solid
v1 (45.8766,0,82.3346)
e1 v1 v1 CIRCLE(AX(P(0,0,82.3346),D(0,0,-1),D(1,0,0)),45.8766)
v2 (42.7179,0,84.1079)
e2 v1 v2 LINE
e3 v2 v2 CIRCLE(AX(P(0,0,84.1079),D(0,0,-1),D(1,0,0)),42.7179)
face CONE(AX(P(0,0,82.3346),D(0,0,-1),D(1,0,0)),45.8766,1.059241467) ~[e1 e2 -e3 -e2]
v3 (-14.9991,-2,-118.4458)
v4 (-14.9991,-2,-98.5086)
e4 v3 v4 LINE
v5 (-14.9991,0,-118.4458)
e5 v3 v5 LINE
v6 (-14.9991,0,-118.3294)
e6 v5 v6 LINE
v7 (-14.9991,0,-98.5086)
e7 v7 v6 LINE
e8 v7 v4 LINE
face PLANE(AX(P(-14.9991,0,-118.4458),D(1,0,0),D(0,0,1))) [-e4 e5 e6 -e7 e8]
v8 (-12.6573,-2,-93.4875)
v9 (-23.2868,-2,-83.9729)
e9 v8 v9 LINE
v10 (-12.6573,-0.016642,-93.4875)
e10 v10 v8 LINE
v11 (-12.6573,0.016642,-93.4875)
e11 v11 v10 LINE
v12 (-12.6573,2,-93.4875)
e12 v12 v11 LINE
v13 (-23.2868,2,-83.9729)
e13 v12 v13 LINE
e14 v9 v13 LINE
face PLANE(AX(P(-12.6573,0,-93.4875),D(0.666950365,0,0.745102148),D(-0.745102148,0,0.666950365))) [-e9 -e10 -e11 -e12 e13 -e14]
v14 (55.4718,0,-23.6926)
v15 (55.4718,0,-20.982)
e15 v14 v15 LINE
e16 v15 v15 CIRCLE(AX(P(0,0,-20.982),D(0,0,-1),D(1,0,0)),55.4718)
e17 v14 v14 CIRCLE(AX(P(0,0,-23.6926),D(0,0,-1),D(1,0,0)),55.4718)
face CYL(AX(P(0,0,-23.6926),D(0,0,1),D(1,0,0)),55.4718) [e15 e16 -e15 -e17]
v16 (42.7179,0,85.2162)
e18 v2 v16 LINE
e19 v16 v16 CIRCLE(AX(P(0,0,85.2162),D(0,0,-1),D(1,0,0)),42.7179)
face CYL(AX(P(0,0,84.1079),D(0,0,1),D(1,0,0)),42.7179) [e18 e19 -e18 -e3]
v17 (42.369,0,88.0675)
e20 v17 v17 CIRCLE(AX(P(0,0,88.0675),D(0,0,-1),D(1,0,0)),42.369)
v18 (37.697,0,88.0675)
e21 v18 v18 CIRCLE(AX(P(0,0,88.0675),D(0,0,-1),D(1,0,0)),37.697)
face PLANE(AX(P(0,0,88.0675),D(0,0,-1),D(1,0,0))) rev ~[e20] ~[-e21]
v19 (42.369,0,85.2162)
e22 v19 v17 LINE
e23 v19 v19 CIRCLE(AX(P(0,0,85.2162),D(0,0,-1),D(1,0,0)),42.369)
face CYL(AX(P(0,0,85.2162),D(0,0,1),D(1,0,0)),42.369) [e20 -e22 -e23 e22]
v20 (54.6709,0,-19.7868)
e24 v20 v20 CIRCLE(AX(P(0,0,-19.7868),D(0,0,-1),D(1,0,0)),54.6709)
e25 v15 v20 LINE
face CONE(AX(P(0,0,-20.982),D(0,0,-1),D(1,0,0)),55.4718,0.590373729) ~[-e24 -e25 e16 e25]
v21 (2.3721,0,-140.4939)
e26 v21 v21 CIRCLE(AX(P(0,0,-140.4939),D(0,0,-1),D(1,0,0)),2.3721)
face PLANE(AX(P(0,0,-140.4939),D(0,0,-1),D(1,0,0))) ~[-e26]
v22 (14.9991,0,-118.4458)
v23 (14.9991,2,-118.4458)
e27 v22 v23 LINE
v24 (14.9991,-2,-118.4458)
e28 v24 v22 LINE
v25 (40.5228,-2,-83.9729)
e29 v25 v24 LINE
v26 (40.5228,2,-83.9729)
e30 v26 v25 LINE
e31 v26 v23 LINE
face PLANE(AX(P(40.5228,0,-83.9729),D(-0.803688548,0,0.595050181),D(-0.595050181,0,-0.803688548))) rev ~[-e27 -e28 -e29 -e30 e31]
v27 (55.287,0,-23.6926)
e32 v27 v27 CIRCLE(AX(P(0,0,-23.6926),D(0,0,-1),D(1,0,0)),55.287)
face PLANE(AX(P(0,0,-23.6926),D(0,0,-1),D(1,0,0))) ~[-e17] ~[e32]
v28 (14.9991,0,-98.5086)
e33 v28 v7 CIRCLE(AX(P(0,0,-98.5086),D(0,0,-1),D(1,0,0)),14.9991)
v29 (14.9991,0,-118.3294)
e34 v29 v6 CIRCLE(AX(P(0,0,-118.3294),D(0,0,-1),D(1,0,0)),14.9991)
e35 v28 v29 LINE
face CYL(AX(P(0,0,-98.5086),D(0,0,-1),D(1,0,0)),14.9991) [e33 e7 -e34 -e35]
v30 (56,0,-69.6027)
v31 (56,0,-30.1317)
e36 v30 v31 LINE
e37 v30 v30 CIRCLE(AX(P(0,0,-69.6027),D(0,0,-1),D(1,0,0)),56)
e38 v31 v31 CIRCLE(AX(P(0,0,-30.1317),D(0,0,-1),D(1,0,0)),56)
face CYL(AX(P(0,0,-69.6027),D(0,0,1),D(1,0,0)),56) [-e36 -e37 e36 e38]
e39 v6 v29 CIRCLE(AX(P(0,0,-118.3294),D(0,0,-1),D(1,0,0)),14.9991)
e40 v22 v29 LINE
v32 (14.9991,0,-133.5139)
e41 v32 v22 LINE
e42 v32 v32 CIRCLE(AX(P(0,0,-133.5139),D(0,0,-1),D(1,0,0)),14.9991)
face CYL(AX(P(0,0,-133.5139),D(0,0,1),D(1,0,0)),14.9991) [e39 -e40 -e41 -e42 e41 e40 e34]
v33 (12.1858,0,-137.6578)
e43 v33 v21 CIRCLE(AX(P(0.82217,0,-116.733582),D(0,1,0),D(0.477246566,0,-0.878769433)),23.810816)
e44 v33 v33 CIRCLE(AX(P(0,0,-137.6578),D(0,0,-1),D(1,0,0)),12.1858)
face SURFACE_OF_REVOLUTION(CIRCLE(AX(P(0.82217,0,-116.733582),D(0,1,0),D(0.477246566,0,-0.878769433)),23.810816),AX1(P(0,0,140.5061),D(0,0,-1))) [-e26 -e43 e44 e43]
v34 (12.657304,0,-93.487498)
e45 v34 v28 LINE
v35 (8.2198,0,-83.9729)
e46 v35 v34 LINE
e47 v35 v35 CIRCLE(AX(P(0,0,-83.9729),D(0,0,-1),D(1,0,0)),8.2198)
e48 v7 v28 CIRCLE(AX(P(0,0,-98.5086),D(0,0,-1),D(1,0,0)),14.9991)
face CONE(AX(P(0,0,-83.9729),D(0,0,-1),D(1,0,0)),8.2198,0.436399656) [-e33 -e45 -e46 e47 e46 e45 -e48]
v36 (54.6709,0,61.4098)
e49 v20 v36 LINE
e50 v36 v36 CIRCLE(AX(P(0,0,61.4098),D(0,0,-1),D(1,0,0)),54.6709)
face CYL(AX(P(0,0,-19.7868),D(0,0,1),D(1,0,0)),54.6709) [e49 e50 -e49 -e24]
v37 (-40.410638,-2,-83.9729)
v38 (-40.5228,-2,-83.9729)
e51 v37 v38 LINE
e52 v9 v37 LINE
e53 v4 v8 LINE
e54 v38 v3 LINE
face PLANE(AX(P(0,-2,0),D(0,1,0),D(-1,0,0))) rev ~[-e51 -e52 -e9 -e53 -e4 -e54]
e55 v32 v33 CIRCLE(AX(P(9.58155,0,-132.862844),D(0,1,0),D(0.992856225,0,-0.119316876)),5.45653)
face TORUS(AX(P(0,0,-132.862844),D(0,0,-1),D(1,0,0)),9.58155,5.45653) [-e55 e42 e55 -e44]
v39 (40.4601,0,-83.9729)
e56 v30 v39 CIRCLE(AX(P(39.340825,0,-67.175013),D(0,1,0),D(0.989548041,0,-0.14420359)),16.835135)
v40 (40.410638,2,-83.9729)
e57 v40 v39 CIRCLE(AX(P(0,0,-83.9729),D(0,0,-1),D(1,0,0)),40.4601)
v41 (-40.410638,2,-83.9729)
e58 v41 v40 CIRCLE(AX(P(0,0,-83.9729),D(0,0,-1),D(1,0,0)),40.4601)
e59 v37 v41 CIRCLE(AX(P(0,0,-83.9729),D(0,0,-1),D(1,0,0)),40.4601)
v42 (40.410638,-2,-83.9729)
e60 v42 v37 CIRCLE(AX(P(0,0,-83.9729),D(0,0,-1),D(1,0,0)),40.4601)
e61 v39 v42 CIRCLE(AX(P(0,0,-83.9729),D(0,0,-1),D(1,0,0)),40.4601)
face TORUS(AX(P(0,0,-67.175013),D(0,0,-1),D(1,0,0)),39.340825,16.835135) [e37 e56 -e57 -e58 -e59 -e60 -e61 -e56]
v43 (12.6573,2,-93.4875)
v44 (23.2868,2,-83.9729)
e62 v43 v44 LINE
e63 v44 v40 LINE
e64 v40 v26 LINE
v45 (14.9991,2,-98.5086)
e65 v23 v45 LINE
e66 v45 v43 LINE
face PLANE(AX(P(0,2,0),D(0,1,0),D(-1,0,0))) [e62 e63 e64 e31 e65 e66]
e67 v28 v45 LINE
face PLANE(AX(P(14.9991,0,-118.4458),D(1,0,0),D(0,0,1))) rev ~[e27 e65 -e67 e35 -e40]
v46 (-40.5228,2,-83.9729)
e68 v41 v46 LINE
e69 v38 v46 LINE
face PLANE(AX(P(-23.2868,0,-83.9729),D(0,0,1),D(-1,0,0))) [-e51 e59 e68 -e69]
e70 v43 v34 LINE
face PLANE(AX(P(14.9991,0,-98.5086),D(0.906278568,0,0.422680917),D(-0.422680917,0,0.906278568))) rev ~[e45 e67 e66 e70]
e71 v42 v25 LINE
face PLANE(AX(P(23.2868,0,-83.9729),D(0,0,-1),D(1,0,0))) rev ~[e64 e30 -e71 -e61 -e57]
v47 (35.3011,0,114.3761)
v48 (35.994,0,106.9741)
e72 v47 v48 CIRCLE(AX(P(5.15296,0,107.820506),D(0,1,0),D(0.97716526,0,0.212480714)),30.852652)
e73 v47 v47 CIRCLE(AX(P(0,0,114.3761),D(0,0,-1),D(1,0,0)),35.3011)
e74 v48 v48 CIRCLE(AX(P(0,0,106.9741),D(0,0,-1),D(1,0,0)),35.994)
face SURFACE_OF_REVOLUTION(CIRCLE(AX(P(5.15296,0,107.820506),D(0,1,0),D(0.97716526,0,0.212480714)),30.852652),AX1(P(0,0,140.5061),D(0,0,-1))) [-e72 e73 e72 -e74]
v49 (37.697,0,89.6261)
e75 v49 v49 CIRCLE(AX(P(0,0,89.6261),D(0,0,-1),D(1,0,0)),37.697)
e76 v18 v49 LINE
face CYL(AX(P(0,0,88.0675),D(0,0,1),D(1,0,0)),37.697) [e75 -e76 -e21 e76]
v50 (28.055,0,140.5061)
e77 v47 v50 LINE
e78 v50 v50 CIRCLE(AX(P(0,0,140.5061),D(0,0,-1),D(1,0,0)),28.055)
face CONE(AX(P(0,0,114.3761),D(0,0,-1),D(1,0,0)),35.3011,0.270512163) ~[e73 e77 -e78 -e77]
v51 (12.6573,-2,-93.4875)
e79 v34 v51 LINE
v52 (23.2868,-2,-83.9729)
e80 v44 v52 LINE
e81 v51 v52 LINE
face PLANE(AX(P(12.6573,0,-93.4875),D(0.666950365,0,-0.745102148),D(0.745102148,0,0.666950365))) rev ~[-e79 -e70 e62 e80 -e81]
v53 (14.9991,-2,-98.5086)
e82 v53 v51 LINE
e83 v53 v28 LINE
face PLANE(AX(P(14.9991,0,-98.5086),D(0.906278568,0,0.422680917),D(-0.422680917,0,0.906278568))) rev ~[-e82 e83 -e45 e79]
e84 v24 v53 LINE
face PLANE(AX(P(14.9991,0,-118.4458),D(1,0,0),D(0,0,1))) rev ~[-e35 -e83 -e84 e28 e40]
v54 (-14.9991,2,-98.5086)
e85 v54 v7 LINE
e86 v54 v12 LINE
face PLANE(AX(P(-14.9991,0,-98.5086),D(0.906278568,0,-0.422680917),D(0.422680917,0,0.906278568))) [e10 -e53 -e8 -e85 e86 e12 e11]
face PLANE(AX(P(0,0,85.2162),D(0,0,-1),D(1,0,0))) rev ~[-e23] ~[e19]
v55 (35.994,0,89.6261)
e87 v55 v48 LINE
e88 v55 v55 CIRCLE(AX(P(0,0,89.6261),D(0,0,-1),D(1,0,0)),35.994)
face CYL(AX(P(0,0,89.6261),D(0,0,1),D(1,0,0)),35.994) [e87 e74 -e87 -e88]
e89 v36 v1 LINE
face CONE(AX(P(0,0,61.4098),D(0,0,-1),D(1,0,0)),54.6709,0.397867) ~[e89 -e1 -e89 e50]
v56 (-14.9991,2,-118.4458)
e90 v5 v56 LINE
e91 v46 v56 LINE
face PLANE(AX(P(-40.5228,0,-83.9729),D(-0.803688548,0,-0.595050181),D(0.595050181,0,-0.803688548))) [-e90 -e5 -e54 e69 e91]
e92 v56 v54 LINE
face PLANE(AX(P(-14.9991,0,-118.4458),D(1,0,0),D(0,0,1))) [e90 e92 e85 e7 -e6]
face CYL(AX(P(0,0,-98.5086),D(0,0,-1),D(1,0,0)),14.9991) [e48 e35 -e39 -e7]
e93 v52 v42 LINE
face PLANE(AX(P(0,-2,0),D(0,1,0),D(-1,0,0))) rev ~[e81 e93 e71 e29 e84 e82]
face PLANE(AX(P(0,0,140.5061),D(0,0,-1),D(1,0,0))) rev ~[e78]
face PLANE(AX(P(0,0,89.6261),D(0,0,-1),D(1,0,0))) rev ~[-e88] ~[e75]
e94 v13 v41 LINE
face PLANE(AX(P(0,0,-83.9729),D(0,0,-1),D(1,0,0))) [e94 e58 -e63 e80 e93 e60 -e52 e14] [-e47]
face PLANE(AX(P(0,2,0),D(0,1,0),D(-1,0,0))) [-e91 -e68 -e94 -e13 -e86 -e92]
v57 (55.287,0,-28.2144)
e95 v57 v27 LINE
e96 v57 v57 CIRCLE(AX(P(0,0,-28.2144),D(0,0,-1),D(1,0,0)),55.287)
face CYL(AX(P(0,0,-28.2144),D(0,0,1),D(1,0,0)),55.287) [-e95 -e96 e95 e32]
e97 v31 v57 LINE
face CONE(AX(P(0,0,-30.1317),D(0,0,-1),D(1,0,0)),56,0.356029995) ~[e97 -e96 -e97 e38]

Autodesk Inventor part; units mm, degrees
ref_plane "YZ Plane" through (0, 0, 0) normal (1, 0, 0) x (0, 1, 0)
ref_plane "XZ Plane" through (0, 0, 0) normal (0, 1, 0) x (-1, 0, 0)
ref_plane "XY Plane" through (0, 0, 0) normal (0, 0, 1) x (1, 0, 0)
sketch "Sketch3" plane through (0, 0, 0) normal (0, 1, 0) x (-1, 0, 0)
  line L0 (-148.4998, -210.0502) -> (-148.4998, 210.0502) construction
  line L1 (-148.4998, 210.0502) -> (148.4998, 210.0502) construction
  line L2 (148.4998, 210.0502) -> (148.4998, -210.0502) construction
  line L3 (148.4998, -210.0502) -> (-148.4998, -210.0502) construction
  line L4 (-278.8232, 0) -> (0, 0) construction
  line L5 (0, 0) -> (0, 323.3607) construction
  line L6 (-14.9991, -133.5139) -> (-14.9991, -118.3294)
  line L7 (-56, -69.6027) -> (-56, -30.1317)
  line L8 (-56, -30.1317) -> (-55.287, -28.2144)
  line L9 (-55.287, -28.2144) -> (-55.287, -23.6926)
  line L10 (-55.287, -23.6926) -> (-55.4718, -23.6926)
  line L11 (-55.4718, -23.6926) -> (-55.4718, -20.982)
  line L12 (-55.4718, -20.982) -> (-54.6709, -19.7868)
  line L13 (-54.6709, -19.7868) -> (-54.6709, 61.4098)
  line L14 (-54.6709, 61.4098) -> (-45.8766, 82.3346)
  line L15 (-45.8766, 82.3346) -> (-42.7179, 84.1079)
  line L16 (-42.7179, 84.1079) -> (-42.7179, 85.2162)
  line L17 (-42.7179, 85.2162) -> (-42.369, 85.2162)
  line L18 (-42.369, 85.2162) -> (-42.369, 88.0675)
  line L19 (-42.369, 88.0675) -> (-37.697, 88.0675)
  line L20 (-37.697, 88.0675) -> (-37.697, 89.6261)
  line L21 (-37.697, 89.6261) -> (-35.994, 89.6261)
  line L22 (-35.994, 89.6261) -> (-35.994, 106.9741)
  line L23 (-35.3011, 114.3761) -> (-28.055, 140.5061)
  line L24 (-28.055, 140.5061) -> (0, 140.5061)
  arc A0 (-12.1858, -137.6578) -> (-2.3721, -140.4939) centre (-0.8223, -116.7339) ccw
  arc A1 (-14.9991, -133.5139) -> (-12.1858, -137.6578) centre (-9.5817, -132.8629) ccw
  line L25 (0, -140.4939) -> (-2.3721, -140.4939)
  line L26 (0, 140.5061) -> (0, -140.4939)
  arc A2 (-35.3011, 114.3761) -> (-35.994, 106.9741) centre (-5.1555, 107.8209) ccw
  arc A3 (-56, -69.6027) -> (-40.4601, -83.9729) centre (-39.3408, -67.175) ccw
  line L27 (-40.4601, -83.9729) -> (-8.2198, -83.9729)
  line L28 (-8.2198, -83.9729) -> (-14.9991, -98.5086)
  line L29 (-14.9991, -98.5086) -> (-14.9991, -118.3294)
  dimension "d79" = 281
  dimension "d83" = 56
revolve "Motor" add sketch "Sketch3" angle 360 about axis through (0, 0, 140.5061) along (0, 0, -1)
sketch "Sketch6" plane through (0, 0, 0) normal (0, 1, 0) x (-1, 0, 0)
  line L0 (-14.9991, -118.4458) -> (-14.9991, -98.5086)
  line L1 (-12.6573, -93.4875) -> (-23.2868, -83.9729)
  line L2 (-23.2868, -83.9729) -> (-40.5228, -83.9729)
  line L3 (-40.5228, -83.9729) -> (-14.9991, -118.4458)
  line L4 (14.9991, -98.5086) -> (-14.9991, -98.5086) projected
  line L5 (-14.9991, -98.5086) -> (-12.6573, -93.4875)
  line L6 (0, -142.1349) -> (0, 23.6892) construction
  line L7 (14.9991, -118.4458) -> (14.9991, -98.5086)
  line L8 (12.6573, -93.4875) -> (23.2868, -83.9729)
  line L9 (23.2868, -83.9729) -> (40.5228, -83.9729)
  line L10 (40.5228, -83.9729) -> (14.9991, -118.4458)
  line L11 (14.9991, -98.5086) -> (12.6573, -93.4875)
  point P0 (0, 0)
extrude "Motor inlet" add sketch "Sketch6" along normal mid plane 4
properties part number "Engine"
